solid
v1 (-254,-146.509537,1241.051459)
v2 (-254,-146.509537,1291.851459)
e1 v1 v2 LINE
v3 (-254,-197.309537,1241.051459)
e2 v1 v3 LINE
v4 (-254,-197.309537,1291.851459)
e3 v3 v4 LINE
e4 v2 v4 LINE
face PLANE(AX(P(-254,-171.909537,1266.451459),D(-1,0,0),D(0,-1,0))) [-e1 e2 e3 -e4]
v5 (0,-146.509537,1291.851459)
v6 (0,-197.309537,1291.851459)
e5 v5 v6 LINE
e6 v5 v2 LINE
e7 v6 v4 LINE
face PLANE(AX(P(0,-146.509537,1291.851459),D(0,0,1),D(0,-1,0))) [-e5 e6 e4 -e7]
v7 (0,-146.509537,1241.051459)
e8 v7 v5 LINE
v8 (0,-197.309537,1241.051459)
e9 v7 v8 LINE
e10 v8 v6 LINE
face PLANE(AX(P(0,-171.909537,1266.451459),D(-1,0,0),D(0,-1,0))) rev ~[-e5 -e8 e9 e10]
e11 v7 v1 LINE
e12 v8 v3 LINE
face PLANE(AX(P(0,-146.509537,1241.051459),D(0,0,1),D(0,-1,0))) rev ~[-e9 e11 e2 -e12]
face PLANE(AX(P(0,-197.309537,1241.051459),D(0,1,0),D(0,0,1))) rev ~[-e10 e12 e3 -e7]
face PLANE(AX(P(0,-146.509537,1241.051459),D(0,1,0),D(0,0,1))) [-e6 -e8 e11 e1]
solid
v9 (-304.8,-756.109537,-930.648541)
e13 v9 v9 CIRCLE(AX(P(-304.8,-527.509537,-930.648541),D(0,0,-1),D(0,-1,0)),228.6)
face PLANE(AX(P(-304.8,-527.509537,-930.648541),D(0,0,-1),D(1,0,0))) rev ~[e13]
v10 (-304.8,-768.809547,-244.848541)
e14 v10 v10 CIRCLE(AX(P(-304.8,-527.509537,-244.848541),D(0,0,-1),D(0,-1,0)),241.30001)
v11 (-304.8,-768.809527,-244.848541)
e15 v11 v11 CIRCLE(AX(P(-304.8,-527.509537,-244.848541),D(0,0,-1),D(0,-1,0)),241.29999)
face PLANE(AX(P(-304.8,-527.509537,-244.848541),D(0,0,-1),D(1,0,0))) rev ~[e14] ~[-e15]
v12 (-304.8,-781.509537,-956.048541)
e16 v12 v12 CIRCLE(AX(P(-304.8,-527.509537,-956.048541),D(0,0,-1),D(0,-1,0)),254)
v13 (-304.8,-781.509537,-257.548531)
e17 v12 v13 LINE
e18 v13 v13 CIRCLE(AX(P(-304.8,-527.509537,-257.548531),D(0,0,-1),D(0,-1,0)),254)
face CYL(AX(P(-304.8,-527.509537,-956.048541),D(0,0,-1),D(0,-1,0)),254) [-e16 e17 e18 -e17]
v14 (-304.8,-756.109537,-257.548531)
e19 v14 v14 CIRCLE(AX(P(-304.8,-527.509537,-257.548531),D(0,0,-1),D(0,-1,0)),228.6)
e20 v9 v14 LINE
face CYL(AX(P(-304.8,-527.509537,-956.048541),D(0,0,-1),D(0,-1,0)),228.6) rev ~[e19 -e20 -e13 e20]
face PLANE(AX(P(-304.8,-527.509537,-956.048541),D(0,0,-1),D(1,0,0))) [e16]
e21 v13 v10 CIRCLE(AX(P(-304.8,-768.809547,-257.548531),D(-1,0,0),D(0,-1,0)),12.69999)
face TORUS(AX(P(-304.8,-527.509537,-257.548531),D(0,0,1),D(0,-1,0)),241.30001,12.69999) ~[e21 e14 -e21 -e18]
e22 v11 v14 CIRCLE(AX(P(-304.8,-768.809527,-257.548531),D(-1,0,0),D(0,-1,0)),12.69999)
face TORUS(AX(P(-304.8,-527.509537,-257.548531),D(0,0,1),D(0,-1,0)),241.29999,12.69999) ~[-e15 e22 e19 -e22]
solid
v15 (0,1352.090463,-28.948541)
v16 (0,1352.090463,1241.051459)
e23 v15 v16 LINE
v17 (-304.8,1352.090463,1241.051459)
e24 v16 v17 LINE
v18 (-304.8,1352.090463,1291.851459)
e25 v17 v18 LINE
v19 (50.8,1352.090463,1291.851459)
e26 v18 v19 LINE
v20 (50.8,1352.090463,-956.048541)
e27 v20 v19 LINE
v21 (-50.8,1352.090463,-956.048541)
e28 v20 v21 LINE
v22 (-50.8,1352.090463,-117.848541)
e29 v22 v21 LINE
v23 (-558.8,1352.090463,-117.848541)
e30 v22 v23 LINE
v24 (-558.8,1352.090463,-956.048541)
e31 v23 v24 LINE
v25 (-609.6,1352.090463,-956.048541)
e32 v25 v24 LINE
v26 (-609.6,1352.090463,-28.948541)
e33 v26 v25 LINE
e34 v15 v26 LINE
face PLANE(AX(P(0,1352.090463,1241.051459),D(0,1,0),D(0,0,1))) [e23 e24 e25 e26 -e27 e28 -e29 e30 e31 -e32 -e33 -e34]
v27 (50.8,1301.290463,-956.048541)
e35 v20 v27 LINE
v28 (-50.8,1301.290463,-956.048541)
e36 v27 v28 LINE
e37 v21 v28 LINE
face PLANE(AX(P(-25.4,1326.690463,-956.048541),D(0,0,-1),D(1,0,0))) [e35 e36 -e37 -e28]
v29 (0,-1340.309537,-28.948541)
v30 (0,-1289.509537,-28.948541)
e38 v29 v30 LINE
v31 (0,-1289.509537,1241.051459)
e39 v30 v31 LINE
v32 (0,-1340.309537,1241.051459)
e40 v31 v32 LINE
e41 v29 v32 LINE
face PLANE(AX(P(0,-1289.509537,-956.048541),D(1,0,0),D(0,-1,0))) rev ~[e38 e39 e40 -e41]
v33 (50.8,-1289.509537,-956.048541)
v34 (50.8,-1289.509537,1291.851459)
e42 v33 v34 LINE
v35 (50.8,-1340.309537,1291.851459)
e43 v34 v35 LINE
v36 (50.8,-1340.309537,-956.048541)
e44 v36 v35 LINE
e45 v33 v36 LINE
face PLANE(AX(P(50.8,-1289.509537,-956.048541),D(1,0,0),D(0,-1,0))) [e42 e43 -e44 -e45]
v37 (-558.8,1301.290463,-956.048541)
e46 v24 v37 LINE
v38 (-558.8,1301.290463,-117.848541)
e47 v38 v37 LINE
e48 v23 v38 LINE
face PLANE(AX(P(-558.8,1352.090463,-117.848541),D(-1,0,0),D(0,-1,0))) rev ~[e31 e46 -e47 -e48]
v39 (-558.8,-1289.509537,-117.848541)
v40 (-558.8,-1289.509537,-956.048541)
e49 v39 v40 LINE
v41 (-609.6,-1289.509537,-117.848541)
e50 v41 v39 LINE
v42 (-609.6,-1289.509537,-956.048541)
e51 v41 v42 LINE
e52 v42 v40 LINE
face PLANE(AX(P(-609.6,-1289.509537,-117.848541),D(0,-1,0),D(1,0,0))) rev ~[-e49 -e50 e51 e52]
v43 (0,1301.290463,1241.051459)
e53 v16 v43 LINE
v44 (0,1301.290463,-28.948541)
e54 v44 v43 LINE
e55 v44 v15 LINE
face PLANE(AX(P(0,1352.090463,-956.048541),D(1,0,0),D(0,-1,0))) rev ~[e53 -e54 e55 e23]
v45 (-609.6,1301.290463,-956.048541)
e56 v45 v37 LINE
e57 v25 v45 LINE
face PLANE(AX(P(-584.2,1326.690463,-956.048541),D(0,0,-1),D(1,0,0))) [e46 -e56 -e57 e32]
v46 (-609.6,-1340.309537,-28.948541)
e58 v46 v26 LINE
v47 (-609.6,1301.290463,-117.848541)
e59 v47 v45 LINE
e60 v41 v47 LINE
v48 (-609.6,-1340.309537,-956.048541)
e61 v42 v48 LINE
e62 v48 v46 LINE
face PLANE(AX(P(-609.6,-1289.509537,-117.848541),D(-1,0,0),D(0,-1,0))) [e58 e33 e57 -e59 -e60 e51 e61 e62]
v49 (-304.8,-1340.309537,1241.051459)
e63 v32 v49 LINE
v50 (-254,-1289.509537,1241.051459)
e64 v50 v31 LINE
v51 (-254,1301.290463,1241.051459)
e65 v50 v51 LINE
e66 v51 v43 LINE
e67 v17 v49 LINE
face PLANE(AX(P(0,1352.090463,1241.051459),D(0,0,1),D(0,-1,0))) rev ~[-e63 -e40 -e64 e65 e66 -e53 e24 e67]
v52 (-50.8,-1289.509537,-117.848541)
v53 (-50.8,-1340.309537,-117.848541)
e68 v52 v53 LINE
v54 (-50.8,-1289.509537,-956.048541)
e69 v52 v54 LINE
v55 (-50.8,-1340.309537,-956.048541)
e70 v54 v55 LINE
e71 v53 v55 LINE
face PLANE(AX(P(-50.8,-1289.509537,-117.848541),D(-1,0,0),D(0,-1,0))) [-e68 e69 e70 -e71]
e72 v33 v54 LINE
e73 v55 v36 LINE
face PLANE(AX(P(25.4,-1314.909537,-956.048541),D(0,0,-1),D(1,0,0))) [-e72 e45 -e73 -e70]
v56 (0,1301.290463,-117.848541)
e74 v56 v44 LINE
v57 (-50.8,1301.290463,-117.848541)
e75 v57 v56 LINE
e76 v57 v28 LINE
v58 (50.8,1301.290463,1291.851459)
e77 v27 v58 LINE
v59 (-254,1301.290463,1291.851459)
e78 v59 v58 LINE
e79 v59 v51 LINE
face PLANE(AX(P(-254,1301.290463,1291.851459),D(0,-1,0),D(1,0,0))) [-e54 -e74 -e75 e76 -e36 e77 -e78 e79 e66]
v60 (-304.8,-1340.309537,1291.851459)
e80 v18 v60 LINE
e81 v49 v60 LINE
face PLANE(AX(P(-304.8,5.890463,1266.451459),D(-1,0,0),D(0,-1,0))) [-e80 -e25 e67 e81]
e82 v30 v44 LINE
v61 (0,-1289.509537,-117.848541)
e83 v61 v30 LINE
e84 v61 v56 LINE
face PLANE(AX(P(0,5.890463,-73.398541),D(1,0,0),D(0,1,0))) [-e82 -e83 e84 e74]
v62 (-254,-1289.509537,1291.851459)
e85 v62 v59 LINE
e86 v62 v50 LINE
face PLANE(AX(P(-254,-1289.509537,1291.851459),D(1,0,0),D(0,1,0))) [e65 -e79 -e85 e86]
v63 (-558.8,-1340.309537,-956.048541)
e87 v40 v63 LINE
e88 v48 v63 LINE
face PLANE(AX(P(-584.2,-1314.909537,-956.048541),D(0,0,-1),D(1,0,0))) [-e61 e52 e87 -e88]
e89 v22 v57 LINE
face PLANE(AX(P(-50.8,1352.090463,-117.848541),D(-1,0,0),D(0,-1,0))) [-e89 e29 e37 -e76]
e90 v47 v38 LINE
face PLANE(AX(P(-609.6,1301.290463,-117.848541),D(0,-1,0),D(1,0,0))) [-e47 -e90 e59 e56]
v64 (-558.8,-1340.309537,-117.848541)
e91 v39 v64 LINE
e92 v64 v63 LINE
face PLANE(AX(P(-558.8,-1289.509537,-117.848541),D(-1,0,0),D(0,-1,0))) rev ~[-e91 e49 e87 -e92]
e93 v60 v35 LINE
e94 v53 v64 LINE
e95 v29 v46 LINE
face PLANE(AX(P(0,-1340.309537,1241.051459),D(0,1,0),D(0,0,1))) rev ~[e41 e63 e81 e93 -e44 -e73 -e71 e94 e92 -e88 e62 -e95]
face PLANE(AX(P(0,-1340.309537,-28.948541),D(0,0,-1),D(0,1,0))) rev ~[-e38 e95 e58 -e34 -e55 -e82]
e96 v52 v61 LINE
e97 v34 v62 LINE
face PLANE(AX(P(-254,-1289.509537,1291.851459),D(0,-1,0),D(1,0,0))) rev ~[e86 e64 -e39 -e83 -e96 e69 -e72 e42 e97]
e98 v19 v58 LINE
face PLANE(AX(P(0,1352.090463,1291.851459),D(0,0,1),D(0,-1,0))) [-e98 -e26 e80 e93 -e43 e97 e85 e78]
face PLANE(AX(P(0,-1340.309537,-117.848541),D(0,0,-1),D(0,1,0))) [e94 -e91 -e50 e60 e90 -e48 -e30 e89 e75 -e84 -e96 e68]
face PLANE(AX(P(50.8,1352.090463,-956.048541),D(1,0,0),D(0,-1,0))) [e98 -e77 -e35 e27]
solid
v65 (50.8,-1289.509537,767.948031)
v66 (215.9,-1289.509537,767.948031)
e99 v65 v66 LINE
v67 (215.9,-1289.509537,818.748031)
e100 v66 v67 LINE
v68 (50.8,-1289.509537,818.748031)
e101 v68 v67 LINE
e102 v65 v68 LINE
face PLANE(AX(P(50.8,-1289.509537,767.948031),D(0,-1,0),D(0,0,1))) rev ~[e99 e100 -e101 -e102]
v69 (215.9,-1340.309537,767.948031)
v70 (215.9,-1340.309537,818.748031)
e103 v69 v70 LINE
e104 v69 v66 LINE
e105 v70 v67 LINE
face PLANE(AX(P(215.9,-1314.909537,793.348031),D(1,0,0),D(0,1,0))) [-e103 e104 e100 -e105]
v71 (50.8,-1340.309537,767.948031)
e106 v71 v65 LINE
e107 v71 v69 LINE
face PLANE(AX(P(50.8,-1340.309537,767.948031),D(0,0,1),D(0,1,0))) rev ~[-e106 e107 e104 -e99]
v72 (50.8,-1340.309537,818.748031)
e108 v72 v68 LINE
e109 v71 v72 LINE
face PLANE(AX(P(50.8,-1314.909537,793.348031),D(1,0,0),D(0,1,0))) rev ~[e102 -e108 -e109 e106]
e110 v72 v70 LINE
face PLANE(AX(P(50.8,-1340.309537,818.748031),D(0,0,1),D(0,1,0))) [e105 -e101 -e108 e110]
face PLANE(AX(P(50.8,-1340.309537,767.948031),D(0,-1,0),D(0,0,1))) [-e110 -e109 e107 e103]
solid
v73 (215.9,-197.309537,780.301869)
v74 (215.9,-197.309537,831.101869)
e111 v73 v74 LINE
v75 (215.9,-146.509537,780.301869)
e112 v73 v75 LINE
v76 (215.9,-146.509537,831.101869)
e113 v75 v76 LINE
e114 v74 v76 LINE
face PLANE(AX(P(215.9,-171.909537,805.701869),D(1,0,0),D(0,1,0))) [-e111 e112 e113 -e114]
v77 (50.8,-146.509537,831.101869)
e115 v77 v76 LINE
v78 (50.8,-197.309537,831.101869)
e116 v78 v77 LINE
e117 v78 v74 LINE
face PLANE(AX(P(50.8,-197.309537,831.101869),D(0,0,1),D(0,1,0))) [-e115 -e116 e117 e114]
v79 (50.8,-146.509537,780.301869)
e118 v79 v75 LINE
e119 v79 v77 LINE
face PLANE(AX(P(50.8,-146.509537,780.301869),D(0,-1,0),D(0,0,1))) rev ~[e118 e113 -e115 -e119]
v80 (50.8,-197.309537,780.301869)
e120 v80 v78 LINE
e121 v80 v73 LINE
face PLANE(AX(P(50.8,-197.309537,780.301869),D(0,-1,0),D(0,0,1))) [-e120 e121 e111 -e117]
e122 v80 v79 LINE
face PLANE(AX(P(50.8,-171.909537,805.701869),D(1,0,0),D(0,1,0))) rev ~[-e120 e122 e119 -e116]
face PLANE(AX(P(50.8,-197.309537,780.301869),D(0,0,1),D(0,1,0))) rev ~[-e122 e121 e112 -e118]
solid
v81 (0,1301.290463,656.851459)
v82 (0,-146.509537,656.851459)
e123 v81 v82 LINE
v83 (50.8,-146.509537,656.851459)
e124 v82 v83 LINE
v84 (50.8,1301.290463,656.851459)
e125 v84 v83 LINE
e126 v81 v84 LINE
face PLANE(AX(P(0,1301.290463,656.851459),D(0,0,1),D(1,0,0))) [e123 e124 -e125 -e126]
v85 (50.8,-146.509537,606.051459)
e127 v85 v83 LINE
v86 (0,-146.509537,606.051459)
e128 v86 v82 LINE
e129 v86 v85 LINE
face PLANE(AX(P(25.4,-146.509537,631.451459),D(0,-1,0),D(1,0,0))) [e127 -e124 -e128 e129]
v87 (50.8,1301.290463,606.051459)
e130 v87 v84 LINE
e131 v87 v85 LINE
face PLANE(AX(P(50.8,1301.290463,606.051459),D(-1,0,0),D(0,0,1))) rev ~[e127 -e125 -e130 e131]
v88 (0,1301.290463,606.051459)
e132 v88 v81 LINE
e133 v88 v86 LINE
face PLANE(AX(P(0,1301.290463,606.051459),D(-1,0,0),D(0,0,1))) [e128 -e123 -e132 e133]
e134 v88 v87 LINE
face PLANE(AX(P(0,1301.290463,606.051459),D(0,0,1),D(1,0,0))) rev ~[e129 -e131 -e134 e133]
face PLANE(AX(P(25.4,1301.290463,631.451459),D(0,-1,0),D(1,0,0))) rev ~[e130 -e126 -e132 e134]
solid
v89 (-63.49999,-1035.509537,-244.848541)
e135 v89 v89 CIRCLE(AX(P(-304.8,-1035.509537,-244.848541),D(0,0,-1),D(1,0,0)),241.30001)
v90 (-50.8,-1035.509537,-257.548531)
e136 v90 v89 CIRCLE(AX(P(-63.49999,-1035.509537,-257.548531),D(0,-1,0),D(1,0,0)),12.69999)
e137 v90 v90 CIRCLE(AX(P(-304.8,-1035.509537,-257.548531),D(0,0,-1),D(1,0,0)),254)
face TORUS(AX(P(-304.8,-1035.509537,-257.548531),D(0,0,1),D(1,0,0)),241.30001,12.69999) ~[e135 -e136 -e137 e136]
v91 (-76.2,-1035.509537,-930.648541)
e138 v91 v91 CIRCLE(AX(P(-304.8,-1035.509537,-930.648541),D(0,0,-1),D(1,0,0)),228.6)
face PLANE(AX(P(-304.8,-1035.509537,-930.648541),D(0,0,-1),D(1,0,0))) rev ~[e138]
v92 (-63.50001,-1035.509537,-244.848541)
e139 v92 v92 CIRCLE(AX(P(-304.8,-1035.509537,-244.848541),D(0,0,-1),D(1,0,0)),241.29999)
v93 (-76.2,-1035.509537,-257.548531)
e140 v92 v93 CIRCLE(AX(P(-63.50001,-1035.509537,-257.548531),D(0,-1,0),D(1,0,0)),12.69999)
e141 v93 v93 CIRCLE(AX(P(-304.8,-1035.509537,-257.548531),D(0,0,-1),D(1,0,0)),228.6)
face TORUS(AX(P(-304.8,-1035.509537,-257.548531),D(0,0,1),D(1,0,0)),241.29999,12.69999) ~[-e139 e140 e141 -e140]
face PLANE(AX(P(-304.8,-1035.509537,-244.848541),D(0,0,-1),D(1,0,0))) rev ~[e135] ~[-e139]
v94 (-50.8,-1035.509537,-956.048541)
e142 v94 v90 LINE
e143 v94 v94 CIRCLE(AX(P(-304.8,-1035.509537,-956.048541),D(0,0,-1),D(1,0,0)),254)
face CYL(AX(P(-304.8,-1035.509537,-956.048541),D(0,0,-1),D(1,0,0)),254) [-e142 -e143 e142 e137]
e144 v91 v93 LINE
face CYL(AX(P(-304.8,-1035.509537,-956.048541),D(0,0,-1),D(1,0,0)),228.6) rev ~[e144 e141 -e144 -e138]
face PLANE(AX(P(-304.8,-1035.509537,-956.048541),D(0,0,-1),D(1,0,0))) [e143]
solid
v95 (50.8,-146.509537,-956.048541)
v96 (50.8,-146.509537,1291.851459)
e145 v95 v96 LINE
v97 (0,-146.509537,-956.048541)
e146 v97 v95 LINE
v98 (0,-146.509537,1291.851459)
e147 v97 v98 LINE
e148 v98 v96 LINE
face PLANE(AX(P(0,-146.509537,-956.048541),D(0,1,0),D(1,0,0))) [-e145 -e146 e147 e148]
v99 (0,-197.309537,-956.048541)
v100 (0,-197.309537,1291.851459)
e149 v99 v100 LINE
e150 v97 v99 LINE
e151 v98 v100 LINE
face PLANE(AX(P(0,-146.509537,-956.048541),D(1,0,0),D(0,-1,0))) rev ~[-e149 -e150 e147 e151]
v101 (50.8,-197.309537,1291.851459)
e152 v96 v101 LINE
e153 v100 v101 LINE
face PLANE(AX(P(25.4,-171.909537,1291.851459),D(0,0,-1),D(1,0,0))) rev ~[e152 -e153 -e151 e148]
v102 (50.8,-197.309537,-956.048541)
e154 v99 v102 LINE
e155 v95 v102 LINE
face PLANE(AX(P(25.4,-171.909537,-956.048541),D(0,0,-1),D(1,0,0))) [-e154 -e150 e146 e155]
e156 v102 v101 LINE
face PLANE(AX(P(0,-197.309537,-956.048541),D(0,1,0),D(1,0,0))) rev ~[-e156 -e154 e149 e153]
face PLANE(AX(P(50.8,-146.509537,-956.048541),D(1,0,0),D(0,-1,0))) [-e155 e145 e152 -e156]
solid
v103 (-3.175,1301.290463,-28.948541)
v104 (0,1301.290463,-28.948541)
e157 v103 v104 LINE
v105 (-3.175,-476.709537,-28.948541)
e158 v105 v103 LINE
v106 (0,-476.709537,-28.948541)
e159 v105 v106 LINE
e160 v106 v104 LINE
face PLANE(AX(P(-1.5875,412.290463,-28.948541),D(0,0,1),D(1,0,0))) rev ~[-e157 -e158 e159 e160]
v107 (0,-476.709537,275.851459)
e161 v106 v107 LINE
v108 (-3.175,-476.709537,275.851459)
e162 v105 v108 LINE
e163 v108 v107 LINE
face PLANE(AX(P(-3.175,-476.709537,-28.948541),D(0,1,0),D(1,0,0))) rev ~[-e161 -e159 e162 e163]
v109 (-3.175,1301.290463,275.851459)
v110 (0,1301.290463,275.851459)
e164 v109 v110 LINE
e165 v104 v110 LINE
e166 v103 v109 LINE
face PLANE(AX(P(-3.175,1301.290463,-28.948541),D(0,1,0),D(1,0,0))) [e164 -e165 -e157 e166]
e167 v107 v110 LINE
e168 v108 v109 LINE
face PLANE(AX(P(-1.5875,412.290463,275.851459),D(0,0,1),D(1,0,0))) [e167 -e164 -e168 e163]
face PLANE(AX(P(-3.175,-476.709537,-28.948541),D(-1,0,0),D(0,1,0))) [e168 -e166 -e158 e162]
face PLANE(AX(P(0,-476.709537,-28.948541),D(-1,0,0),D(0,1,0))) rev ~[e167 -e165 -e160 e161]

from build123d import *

# Parameters (mm, degrees)
F0_W      = 2692.4
F0_H      = 88.9
F1_DEPTH  = 609.6
F2_W      = 50.8
F2_H      = 50.8
F3_DEPTH  = 838.2
F5_DEPTH  = 711.2
F6_W      = 50.8
F6_H      = 50.8
F7_DEPTH  = 2247.9
F8_W      = 2692.4
F8_H      = 50.8
F9_DEPTH  = 304.8
F10_W     = 254
F10_H     = 2590.8
F11_DEPTH = 50.8
F12_W     = 3.175
F12_H     = 1778
F13_DEPTH = 304.8
F14_W     = 50.8
F14_H     = 50.8
F15_DEPTH = 2247.9
F16_T     = -25.4
F17_T     = -25.4
F18_R     = 12.69999
F19_R     = 12.69999
F20_W     = 50.8
F20_H     = 50.8
F21_DEPTH = 1447.8
F22_W     = 50.8
F22_H     = 50.8
F23_DEPTH = 165.1
F24_W     = 50.8
F24_H     = 50.8
F25_DEPTH = 254


# Not quite as in the source:
# - a fillet or chamfer is up to 0.001 mm smaller than in the source, because OpenCascade refuses the exact size


with BuildPart() as f1:
    # F0 (on Right) → F1 (new body)
    with BuildSketch(Plane.YZ):
        with Locations((5.8904625475, -73.3985408201)):
            Rectangle(F0_W, F0_H)
    extrude(amount=-F1_DEPTH)

    # F2 (on face) → F3 (join)
    with BuildSketch(Plane(origin=(0, 0, -117.8485408201), x_dir=(1, 0, 0), z_dir=(0, 0, -1))):
        with Locations((-584.2, 1314.9095374525)):
            Rectangle(F2_W, F2_H)
        with Locations((-25.4, 1314.9095374525)):
            Rectangle(F2_W, F2_H)
        with Locations((-25.4, -1326.6904625475)):
            Rectangle(F2_W, F2_H)
        with Locations((-584.2, -1326.6904625475)):
            Rectangle(F2_W, F2_H)
    extrude(amount=F3_DEPTH)

    # F6 (on face) → F7 (join)
    with BuildSketch(Plane(origin=(0, 0, -956.0485408201), x_dir=(1, 0, 0), z_dir=(0, 0, -1))):
        with Locations((25.4, 1314.9095374525)):
            Rectangle(F6_W, F6_H)
        with Locations((25.4, -1326.6904625475)):
            Rectangle(F6_W, F6_H)
    extrude(amount=-F7_DEPTH)

    # F8 (on face) → F9 (join)
    with BuildSketch(Plane(origin=(0, 0, 0), x_dir=(0, -1, 0), z_dir=(-1, 0, 0))):
        with Locations((-5.8904625475, 1266.4514591799)):
            Rectangle(F8_W, F8_H)
    extrude(amount=F9_DEPTH)

    # F10 (on face) → F11 (cut, through all)
    with BuildSketch(Plane.XY.offset(1291.8514591799)):
        with Locations((-127, 5.8904625475)):
            Rectangle(F10_W, F10_H)
    extrude(amount=-F11_DEPTH, mode=Mode.SUBTRACT)


with BuildPart() as f5:
    # F4 (on face) → F5 (new body)
    with BuildSketch(Plane(origin=(0, 0, -956.0485408201), x_dir=(1, 0, 0), z_dir=(0, 0, -1))):
        with BuildLine():
            ThreePointArc((-304.8, 781.5095374525), (-125.1948775786, 855.9044150311), (-50.8, 1035.5095374525))
            ThreePointArc((-50.8, 1035.5095374525), (-484.4051224214, 1215.1146598738), (-304.8, 781.5095374525))
        make_face()
    extrude(amount=-F5_DEPTH)

    # F17
    f17_openings = [f5.faces().sort_by_distance(p)[0] for p in [
        (-304.8, -1035.509537, -244.848541),
    ]]
    offset(amount=F17_T, openings=f17_openings)

    # F18 (radius 12.7 in the source; OpenCascade refuses exactly that, so slightly less here)
    f18_edges = [f5.edges().sort_by_distance(p)[0] for p in [
        (-304.8, -1289.509537, -244.848541),
        (-304.8, -1264.109537, -244.848541),
    ]]
    fillet(f18_edges, radius=F18_R)


with BuildPart() as f5b:
    # F4 (on face) → F5, piece 2 (new body)
    with BuildSketch(Plane(origin=(0, 0, -956.0485408201), x_dir=(1, 0, 0), z_dir=(0, 0, -1))):
        with BuildLine():
            ThreePointArc((-50.8, 527.5095374525), (-125.1948775786, 707.1146598738), (-304.8, 781.5095374525))
            ThreePointArc((-304.8, 781.5095374525), (-484.4051224214, 347.9044150311), (-50.8, 527.5095374525))
        make_face()
    extrude(amount=-F5_DEPTH)

    # F16
    f16_openings = [f5b.faces().sort_by_distance(p)[0] for p in [
        (-304.8, -527.509537, -244.848541),
    ]]
    offset(amount=F16_T, openings=f16_openings)

    # F19 (radius 12.7 in the source; OpenCascade refuses exactly that, so slightly less here)
    f19_edges = [f5b.edges().sort_by_distance(p)[0] for p in [
        (-558.8, -527.509537, -244.848541),
        (-533.4, -527.509537, -244.848541),
    ]]
    fillet(f19_edges, radius=F19_R)


with BuildPart() as f13:
    # F12 (on face) → F13 (new body)
    with BuildSketch(Plane.XY.offset(-28.9485408201)):
        with Locations((-1.5875, 412.2904625475)):
            Rectangle(F12_W, F12_H)
    extrude(amount=F13_DEPTH)


with BuildPart() as f15:
    # F14 (on face) → F15 (new body)
    with BuildSketch(Plane(origin=(0, 0, -956.0485408201), x_dir=(1, 0, 0), z_dir=(0, 0, -1))):
        with Locations((25.4, 171.9095374525)):
            Rectangle(F14_W, F14_H)
    extrude(amount=-F15_DEPTH)


with BuildPart() as f21:
    # F20 (on face) → F21 (new body, through all)
    with BuildSketch(Plane.XZ.offset(-1301.2904625475)):
        with Locations((25.4, 631.4514591799)):
            Rectangle(F20_W, F20_H)
    extrude(amount=F21_DEPTH)


with BuildPart() as f23:
    # F22 (on face) → F23 (new body)
    with BuildSketch(Plane.YZ.offset(50.8)):
        with Locations((-171.9095374525, 805.7018689156)):
            Rectangle(F22_W, F22_H)
    extrude(amount=F23_DEPTH)


with BuildPart() as f23b:
    # F22 (on face) → F23, piece 2 (new body)
    with BuildSketch(Plane.YZ.offset(50.8)):
        with Locations((-1314.9095374525, 793.3480314255)):
            Rectangle(F22_W, F22_H)
    extrude(amount=F23_DEPTH)


with BuildPart() as f25:
    # F24 (on face) → F25 (new body, through all)
    with BuildSketch(Plane(origin=(0, 0, 0), x_dir=(0, -1, 0), z_dir=(-1, 0, 0))):
        with Locations((171.9095374525, 1266.4514591799)):
            Rectangle(F24_W, F24_H)
    extrude(amount=F25_DEPTH)


solid = Compound([f1.part, f5.part, f5b.part, f13.part, f15.part, f21.part, f23.part, f23b.part, f25.part])
